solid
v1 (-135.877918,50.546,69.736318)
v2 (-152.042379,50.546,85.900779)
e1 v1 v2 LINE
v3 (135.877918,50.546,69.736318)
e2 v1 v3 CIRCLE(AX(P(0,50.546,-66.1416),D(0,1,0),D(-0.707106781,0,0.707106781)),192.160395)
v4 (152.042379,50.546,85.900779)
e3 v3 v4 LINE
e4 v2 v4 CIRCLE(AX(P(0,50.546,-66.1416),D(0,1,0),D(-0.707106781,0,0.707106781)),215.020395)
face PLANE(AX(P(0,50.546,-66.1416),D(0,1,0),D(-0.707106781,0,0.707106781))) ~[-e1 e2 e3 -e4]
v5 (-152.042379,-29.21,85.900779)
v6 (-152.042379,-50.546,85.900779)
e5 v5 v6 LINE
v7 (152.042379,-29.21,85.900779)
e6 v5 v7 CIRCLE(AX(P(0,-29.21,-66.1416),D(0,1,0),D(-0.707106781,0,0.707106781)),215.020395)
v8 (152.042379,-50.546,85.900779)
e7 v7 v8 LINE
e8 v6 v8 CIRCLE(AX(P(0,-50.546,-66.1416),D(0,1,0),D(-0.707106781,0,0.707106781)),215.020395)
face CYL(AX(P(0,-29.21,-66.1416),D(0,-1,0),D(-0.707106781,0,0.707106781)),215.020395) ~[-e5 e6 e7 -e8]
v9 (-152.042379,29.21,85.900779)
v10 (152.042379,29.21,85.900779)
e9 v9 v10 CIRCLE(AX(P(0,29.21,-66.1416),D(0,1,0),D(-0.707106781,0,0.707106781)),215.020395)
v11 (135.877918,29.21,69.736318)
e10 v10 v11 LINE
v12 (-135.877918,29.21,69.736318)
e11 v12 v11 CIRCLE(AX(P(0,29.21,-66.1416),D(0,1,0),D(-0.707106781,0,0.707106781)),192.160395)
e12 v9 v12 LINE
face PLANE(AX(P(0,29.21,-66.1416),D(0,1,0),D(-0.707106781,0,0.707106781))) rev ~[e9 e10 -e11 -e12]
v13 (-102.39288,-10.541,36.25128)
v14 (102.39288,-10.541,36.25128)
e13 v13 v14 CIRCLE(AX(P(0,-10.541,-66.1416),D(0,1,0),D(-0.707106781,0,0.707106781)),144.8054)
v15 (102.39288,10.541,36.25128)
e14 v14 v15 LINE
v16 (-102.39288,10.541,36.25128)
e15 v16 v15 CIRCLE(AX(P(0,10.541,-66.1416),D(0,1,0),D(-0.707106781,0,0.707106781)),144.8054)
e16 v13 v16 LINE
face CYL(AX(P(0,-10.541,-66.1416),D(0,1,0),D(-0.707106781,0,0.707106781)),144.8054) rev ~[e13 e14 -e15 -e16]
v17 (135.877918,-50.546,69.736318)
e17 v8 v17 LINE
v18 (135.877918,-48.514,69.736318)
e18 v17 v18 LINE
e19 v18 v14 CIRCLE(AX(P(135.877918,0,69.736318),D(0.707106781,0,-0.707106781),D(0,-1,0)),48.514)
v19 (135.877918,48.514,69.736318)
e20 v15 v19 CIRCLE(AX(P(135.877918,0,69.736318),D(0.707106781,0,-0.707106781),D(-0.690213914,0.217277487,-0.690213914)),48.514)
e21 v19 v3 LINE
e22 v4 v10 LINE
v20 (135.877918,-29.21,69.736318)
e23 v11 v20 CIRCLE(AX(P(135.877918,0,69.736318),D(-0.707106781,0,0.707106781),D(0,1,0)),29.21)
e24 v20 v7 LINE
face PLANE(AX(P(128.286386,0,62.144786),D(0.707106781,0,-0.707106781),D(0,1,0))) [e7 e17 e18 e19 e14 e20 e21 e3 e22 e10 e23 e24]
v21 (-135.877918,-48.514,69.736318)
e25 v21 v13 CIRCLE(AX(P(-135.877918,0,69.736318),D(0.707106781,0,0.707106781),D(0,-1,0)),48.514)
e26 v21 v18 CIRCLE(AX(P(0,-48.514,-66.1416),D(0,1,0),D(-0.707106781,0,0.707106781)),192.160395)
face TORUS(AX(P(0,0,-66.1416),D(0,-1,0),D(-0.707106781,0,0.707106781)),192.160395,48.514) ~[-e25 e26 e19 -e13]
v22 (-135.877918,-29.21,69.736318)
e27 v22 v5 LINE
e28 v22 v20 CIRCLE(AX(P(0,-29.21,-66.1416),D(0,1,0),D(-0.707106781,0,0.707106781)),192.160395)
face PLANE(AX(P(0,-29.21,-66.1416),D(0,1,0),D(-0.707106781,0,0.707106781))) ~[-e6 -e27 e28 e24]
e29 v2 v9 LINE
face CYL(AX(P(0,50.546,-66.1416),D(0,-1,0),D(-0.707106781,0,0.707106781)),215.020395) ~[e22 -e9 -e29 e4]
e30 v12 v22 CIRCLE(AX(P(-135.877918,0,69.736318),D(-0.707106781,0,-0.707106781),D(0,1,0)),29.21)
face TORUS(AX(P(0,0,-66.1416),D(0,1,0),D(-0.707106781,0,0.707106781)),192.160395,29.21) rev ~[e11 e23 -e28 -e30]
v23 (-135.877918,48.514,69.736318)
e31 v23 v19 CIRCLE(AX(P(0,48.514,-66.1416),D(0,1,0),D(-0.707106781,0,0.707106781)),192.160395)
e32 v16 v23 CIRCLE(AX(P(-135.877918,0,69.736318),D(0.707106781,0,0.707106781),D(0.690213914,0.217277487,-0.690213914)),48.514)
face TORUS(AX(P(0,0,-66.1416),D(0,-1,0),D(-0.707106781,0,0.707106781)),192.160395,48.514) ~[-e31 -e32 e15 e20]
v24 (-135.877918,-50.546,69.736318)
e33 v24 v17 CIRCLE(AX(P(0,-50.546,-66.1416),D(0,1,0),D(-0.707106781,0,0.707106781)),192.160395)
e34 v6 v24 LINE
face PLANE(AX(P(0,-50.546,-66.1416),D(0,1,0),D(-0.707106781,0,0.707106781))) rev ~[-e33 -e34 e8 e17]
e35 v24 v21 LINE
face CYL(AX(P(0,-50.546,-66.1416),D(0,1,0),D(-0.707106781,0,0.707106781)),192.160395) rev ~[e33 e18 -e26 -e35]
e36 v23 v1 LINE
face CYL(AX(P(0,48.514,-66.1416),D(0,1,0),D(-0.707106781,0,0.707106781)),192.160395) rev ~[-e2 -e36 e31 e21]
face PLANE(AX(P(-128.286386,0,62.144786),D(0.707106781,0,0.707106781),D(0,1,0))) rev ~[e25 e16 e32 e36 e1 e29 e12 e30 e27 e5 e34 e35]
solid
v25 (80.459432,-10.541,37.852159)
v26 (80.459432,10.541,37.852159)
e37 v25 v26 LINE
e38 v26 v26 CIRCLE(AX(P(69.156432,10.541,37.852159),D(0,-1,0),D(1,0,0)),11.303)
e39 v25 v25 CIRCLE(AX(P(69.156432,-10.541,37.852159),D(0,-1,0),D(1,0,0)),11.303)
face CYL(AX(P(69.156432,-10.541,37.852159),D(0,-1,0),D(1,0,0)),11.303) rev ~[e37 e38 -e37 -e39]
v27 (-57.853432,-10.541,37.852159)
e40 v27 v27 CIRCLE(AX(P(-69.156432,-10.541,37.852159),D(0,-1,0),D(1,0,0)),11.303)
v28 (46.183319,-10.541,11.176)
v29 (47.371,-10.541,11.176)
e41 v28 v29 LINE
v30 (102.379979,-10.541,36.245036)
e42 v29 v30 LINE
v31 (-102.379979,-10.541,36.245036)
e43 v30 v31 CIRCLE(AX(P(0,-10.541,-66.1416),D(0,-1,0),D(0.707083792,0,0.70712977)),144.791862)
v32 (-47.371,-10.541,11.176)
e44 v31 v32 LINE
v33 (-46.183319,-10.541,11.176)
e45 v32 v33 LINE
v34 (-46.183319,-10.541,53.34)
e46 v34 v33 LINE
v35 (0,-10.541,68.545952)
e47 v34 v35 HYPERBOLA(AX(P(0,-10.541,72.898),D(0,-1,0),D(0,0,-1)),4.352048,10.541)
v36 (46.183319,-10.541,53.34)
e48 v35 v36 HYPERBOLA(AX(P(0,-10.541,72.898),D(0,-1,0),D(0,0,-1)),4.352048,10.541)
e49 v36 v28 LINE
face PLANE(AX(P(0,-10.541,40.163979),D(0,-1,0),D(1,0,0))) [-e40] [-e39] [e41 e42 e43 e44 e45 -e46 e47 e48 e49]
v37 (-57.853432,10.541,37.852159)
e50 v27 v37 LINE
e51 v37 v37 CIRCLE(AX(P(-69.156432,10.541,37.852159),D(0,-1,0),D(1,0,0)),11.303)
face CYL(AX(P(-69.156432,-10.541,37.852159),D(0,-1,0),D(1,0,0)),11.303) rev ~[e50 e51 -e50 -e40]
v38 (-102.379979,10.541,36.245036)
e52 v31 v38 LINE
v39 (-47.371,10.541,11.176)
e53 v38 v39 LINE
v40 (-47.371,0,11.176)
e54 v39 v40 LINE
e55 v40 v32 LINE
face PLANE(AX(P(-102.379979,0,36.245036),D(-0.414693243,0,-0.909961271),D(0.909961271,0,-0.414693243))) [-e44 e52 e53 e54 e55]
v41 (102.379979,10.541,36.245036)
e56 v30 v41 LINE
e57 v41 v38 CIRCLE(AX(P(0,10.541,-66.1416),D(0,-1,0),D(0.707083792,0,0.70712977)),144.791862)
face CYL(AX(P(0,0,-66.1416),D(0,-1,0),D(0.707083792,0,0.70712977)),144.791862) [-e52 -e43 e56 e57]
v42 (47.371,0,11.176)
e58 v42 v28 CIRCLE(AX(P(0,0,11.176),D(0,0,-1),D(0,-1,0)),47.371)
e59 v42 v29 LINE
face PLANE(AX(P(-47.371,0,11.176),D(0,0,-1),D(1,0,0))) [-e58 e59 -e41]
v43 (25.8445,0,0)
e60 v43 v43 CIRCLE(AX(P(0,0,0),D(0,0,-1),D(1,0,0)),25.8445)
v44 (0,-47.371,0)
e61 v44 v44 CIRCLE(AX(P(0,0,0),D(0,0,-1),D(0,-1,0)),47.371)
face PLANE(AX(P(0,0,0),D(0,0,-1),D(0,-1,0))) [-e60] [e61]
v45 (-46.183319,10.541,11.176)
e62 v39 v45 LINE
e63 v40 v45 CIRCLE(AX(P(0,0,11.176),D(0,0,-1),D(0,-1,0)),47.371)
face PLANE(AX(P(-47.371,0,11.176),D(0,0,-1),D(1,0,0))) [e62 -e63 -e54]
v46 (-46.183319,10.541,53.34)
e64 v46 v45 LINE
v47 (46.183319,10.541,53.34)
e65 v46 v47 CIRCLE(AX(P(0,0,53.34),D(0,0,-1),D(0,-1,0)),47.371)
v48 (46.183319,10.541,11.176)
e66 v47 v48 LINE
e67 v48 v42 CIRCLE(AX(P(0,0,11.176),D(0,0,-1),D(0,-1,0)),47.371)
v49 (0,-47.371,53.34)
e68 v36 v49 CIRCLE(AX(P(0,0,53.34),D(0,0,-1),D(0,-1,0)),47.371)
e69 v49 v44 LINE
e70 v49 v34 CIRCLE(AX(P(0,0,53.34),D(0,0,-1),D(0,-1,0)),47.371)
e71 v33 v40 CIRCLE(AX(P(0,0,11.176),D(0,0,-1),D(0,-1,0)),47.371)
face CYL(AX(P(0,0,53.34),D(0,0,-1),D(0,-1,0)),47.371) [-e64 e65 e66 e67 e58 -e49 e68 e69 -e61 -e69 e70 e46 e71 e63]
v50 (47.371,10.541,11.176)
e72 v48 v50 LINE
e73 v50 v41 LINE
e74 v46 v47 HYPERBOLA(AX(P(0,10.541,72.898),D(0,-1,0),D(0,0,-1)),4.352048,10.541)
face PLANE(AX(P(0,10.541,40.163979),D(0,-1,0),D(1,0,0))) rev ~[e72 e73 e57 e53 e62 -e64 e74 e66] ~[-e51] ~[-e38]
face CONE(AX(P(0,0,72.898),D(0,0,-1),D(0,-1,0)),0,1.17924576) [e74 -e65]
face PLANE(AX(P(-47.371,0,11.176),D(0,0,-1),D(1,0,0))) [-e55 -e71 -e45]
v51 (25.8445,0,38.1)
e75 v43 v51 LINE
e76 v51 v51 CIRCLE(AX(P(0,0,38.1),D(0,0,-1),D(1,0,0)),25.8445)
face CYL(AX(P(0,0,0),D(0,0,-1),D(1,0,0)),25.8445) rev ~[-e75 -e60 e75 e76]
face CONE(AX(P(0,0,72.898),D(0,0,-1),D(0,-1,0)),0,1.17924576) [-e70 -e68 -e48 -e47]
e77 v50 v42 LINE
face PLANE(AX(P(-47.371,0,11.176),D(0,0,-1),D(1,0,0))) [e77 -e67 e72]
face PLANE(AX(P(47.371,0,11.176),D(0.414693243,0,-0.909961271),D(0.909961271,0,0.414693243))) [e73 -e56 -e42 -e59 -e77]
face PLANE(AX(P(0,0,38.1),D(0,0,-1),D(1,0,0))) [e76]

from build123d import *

# Parameters (mm, degrees)
F1_DEPTH      = 10.541
F3_ANGLE_BACK = 45
F3_ANGLE      = 90
F6_R          = 11.303
F7_DEPTH      = 25.4
F8_R          = 25.8445
F9_DEPTH      = 38.1


# Not quite as in the source:
# - a feature names something its author has since deleted; it is built from what else it names


with BuildPart() as f1:
    # F0 (on Front) → F1 (new body, symmetric)
    with BuildSketch(Plane.XZ):
        with BuildLine():
            Line((-102.379978747, 36.2450359051), (-47.371, 11.176))
            Line((-47.371, 11.176), (47.371, 11.176))
            Line((47.371, 11.176), (102.379978747, 36.2450359051))
            ThreePointArc((102.379978747, 36.2450359051), (0, 78.6502618576), (-102.379978747, 36.2450359051))
        make_face()
    extrude(amount=F1_DEPTH, both=True)

    # F4 (on Right) → F5 (revolve)
    with BuildSketch(Plane.YZ):
        Polygon((-47.371, 0), (0, 0), (0, 72.898), (-47.371, 53.34), align=None)
    revolve(axis=Axis((0, 0, 36.449), (0, 0, -1)))

    # F6 (on face) → F7 (cut)
    with BuildSketch(Plane.XZ.offset(10.541)):
        with Locations((-69.1564316947, 37.8521587433)):
            Circle(F6_R)
        with Locations((69.1564316947, 37.8521587433)):
            Circle(F6_R)
    extrude(amount=-F7_DEPTH, mode=Mode.SUBTRACT)

    # F8 (on face) → F9 (cut)
    with BuildSketch(Plane(origin=(0, 0, 0), x_dir=(1, 0, 0), z_dir=(0, 0, -1))):
        Circle(F8_R)
    extrude(amount=-F9_DEPTH, mode=Mode.SUBTRACT)


with BuildPart() as f3:
    # F2 (on Right) → F3 (revolve)
    with BuildSketch(Plane.YZ, mode=Mode.PRIVATE) as f3_sk:
        with BuildLine():
            ThreePointArc((-48.514, 126.0187946151), (-37.8483438872, 95.6689830671), (-10.541, 78.6638))
            Line((-10.541, 78.6638), (10.541, 78.6638))
            ThreePointArc((10.541, 78.6638), (37.8483438872, 95.6689830671), (48.514, 126.0187946151))
            Line((48.514, 126.0187946151), (50.546, 126.0187946151))
            Line((50.546, 126.0187946151), (50.546, 148.8787946151))
            Line((50.546, 148.8787946151), (29.21, 148.8787946151))
            Line((29.21, 148.8787946151), (29.21, 126.0187946151))
            ThreePointArc((29.21, 126.0187946151), (0, 96.8087946151), (-29.21, 126.0187946151))
            Line((-29.21, 126.0187946151), (-29.21, 148.8787946151))
            Line((-29.21, 148.8787946151), (-50.546, 148.8787946151))
            Line((-50.546, 148.8787946151), (-50.546, 126.0187946151))
            Line((-50.546, 126.0187946151), (-48.514, 126.0187946151))
        make_face()
    revolve(f3_sk.sketch.rotate(Axis((0, 7.0290416479, -66.1416), (0, 1, 0)), -F3_ANGLE_BACK), axis=Axis((0, 7.0290416479, -66.1416), (0, 1, 0)), revolution_arc=F3_ANGLE)


solid = Compound([f1.part, f3.part])
